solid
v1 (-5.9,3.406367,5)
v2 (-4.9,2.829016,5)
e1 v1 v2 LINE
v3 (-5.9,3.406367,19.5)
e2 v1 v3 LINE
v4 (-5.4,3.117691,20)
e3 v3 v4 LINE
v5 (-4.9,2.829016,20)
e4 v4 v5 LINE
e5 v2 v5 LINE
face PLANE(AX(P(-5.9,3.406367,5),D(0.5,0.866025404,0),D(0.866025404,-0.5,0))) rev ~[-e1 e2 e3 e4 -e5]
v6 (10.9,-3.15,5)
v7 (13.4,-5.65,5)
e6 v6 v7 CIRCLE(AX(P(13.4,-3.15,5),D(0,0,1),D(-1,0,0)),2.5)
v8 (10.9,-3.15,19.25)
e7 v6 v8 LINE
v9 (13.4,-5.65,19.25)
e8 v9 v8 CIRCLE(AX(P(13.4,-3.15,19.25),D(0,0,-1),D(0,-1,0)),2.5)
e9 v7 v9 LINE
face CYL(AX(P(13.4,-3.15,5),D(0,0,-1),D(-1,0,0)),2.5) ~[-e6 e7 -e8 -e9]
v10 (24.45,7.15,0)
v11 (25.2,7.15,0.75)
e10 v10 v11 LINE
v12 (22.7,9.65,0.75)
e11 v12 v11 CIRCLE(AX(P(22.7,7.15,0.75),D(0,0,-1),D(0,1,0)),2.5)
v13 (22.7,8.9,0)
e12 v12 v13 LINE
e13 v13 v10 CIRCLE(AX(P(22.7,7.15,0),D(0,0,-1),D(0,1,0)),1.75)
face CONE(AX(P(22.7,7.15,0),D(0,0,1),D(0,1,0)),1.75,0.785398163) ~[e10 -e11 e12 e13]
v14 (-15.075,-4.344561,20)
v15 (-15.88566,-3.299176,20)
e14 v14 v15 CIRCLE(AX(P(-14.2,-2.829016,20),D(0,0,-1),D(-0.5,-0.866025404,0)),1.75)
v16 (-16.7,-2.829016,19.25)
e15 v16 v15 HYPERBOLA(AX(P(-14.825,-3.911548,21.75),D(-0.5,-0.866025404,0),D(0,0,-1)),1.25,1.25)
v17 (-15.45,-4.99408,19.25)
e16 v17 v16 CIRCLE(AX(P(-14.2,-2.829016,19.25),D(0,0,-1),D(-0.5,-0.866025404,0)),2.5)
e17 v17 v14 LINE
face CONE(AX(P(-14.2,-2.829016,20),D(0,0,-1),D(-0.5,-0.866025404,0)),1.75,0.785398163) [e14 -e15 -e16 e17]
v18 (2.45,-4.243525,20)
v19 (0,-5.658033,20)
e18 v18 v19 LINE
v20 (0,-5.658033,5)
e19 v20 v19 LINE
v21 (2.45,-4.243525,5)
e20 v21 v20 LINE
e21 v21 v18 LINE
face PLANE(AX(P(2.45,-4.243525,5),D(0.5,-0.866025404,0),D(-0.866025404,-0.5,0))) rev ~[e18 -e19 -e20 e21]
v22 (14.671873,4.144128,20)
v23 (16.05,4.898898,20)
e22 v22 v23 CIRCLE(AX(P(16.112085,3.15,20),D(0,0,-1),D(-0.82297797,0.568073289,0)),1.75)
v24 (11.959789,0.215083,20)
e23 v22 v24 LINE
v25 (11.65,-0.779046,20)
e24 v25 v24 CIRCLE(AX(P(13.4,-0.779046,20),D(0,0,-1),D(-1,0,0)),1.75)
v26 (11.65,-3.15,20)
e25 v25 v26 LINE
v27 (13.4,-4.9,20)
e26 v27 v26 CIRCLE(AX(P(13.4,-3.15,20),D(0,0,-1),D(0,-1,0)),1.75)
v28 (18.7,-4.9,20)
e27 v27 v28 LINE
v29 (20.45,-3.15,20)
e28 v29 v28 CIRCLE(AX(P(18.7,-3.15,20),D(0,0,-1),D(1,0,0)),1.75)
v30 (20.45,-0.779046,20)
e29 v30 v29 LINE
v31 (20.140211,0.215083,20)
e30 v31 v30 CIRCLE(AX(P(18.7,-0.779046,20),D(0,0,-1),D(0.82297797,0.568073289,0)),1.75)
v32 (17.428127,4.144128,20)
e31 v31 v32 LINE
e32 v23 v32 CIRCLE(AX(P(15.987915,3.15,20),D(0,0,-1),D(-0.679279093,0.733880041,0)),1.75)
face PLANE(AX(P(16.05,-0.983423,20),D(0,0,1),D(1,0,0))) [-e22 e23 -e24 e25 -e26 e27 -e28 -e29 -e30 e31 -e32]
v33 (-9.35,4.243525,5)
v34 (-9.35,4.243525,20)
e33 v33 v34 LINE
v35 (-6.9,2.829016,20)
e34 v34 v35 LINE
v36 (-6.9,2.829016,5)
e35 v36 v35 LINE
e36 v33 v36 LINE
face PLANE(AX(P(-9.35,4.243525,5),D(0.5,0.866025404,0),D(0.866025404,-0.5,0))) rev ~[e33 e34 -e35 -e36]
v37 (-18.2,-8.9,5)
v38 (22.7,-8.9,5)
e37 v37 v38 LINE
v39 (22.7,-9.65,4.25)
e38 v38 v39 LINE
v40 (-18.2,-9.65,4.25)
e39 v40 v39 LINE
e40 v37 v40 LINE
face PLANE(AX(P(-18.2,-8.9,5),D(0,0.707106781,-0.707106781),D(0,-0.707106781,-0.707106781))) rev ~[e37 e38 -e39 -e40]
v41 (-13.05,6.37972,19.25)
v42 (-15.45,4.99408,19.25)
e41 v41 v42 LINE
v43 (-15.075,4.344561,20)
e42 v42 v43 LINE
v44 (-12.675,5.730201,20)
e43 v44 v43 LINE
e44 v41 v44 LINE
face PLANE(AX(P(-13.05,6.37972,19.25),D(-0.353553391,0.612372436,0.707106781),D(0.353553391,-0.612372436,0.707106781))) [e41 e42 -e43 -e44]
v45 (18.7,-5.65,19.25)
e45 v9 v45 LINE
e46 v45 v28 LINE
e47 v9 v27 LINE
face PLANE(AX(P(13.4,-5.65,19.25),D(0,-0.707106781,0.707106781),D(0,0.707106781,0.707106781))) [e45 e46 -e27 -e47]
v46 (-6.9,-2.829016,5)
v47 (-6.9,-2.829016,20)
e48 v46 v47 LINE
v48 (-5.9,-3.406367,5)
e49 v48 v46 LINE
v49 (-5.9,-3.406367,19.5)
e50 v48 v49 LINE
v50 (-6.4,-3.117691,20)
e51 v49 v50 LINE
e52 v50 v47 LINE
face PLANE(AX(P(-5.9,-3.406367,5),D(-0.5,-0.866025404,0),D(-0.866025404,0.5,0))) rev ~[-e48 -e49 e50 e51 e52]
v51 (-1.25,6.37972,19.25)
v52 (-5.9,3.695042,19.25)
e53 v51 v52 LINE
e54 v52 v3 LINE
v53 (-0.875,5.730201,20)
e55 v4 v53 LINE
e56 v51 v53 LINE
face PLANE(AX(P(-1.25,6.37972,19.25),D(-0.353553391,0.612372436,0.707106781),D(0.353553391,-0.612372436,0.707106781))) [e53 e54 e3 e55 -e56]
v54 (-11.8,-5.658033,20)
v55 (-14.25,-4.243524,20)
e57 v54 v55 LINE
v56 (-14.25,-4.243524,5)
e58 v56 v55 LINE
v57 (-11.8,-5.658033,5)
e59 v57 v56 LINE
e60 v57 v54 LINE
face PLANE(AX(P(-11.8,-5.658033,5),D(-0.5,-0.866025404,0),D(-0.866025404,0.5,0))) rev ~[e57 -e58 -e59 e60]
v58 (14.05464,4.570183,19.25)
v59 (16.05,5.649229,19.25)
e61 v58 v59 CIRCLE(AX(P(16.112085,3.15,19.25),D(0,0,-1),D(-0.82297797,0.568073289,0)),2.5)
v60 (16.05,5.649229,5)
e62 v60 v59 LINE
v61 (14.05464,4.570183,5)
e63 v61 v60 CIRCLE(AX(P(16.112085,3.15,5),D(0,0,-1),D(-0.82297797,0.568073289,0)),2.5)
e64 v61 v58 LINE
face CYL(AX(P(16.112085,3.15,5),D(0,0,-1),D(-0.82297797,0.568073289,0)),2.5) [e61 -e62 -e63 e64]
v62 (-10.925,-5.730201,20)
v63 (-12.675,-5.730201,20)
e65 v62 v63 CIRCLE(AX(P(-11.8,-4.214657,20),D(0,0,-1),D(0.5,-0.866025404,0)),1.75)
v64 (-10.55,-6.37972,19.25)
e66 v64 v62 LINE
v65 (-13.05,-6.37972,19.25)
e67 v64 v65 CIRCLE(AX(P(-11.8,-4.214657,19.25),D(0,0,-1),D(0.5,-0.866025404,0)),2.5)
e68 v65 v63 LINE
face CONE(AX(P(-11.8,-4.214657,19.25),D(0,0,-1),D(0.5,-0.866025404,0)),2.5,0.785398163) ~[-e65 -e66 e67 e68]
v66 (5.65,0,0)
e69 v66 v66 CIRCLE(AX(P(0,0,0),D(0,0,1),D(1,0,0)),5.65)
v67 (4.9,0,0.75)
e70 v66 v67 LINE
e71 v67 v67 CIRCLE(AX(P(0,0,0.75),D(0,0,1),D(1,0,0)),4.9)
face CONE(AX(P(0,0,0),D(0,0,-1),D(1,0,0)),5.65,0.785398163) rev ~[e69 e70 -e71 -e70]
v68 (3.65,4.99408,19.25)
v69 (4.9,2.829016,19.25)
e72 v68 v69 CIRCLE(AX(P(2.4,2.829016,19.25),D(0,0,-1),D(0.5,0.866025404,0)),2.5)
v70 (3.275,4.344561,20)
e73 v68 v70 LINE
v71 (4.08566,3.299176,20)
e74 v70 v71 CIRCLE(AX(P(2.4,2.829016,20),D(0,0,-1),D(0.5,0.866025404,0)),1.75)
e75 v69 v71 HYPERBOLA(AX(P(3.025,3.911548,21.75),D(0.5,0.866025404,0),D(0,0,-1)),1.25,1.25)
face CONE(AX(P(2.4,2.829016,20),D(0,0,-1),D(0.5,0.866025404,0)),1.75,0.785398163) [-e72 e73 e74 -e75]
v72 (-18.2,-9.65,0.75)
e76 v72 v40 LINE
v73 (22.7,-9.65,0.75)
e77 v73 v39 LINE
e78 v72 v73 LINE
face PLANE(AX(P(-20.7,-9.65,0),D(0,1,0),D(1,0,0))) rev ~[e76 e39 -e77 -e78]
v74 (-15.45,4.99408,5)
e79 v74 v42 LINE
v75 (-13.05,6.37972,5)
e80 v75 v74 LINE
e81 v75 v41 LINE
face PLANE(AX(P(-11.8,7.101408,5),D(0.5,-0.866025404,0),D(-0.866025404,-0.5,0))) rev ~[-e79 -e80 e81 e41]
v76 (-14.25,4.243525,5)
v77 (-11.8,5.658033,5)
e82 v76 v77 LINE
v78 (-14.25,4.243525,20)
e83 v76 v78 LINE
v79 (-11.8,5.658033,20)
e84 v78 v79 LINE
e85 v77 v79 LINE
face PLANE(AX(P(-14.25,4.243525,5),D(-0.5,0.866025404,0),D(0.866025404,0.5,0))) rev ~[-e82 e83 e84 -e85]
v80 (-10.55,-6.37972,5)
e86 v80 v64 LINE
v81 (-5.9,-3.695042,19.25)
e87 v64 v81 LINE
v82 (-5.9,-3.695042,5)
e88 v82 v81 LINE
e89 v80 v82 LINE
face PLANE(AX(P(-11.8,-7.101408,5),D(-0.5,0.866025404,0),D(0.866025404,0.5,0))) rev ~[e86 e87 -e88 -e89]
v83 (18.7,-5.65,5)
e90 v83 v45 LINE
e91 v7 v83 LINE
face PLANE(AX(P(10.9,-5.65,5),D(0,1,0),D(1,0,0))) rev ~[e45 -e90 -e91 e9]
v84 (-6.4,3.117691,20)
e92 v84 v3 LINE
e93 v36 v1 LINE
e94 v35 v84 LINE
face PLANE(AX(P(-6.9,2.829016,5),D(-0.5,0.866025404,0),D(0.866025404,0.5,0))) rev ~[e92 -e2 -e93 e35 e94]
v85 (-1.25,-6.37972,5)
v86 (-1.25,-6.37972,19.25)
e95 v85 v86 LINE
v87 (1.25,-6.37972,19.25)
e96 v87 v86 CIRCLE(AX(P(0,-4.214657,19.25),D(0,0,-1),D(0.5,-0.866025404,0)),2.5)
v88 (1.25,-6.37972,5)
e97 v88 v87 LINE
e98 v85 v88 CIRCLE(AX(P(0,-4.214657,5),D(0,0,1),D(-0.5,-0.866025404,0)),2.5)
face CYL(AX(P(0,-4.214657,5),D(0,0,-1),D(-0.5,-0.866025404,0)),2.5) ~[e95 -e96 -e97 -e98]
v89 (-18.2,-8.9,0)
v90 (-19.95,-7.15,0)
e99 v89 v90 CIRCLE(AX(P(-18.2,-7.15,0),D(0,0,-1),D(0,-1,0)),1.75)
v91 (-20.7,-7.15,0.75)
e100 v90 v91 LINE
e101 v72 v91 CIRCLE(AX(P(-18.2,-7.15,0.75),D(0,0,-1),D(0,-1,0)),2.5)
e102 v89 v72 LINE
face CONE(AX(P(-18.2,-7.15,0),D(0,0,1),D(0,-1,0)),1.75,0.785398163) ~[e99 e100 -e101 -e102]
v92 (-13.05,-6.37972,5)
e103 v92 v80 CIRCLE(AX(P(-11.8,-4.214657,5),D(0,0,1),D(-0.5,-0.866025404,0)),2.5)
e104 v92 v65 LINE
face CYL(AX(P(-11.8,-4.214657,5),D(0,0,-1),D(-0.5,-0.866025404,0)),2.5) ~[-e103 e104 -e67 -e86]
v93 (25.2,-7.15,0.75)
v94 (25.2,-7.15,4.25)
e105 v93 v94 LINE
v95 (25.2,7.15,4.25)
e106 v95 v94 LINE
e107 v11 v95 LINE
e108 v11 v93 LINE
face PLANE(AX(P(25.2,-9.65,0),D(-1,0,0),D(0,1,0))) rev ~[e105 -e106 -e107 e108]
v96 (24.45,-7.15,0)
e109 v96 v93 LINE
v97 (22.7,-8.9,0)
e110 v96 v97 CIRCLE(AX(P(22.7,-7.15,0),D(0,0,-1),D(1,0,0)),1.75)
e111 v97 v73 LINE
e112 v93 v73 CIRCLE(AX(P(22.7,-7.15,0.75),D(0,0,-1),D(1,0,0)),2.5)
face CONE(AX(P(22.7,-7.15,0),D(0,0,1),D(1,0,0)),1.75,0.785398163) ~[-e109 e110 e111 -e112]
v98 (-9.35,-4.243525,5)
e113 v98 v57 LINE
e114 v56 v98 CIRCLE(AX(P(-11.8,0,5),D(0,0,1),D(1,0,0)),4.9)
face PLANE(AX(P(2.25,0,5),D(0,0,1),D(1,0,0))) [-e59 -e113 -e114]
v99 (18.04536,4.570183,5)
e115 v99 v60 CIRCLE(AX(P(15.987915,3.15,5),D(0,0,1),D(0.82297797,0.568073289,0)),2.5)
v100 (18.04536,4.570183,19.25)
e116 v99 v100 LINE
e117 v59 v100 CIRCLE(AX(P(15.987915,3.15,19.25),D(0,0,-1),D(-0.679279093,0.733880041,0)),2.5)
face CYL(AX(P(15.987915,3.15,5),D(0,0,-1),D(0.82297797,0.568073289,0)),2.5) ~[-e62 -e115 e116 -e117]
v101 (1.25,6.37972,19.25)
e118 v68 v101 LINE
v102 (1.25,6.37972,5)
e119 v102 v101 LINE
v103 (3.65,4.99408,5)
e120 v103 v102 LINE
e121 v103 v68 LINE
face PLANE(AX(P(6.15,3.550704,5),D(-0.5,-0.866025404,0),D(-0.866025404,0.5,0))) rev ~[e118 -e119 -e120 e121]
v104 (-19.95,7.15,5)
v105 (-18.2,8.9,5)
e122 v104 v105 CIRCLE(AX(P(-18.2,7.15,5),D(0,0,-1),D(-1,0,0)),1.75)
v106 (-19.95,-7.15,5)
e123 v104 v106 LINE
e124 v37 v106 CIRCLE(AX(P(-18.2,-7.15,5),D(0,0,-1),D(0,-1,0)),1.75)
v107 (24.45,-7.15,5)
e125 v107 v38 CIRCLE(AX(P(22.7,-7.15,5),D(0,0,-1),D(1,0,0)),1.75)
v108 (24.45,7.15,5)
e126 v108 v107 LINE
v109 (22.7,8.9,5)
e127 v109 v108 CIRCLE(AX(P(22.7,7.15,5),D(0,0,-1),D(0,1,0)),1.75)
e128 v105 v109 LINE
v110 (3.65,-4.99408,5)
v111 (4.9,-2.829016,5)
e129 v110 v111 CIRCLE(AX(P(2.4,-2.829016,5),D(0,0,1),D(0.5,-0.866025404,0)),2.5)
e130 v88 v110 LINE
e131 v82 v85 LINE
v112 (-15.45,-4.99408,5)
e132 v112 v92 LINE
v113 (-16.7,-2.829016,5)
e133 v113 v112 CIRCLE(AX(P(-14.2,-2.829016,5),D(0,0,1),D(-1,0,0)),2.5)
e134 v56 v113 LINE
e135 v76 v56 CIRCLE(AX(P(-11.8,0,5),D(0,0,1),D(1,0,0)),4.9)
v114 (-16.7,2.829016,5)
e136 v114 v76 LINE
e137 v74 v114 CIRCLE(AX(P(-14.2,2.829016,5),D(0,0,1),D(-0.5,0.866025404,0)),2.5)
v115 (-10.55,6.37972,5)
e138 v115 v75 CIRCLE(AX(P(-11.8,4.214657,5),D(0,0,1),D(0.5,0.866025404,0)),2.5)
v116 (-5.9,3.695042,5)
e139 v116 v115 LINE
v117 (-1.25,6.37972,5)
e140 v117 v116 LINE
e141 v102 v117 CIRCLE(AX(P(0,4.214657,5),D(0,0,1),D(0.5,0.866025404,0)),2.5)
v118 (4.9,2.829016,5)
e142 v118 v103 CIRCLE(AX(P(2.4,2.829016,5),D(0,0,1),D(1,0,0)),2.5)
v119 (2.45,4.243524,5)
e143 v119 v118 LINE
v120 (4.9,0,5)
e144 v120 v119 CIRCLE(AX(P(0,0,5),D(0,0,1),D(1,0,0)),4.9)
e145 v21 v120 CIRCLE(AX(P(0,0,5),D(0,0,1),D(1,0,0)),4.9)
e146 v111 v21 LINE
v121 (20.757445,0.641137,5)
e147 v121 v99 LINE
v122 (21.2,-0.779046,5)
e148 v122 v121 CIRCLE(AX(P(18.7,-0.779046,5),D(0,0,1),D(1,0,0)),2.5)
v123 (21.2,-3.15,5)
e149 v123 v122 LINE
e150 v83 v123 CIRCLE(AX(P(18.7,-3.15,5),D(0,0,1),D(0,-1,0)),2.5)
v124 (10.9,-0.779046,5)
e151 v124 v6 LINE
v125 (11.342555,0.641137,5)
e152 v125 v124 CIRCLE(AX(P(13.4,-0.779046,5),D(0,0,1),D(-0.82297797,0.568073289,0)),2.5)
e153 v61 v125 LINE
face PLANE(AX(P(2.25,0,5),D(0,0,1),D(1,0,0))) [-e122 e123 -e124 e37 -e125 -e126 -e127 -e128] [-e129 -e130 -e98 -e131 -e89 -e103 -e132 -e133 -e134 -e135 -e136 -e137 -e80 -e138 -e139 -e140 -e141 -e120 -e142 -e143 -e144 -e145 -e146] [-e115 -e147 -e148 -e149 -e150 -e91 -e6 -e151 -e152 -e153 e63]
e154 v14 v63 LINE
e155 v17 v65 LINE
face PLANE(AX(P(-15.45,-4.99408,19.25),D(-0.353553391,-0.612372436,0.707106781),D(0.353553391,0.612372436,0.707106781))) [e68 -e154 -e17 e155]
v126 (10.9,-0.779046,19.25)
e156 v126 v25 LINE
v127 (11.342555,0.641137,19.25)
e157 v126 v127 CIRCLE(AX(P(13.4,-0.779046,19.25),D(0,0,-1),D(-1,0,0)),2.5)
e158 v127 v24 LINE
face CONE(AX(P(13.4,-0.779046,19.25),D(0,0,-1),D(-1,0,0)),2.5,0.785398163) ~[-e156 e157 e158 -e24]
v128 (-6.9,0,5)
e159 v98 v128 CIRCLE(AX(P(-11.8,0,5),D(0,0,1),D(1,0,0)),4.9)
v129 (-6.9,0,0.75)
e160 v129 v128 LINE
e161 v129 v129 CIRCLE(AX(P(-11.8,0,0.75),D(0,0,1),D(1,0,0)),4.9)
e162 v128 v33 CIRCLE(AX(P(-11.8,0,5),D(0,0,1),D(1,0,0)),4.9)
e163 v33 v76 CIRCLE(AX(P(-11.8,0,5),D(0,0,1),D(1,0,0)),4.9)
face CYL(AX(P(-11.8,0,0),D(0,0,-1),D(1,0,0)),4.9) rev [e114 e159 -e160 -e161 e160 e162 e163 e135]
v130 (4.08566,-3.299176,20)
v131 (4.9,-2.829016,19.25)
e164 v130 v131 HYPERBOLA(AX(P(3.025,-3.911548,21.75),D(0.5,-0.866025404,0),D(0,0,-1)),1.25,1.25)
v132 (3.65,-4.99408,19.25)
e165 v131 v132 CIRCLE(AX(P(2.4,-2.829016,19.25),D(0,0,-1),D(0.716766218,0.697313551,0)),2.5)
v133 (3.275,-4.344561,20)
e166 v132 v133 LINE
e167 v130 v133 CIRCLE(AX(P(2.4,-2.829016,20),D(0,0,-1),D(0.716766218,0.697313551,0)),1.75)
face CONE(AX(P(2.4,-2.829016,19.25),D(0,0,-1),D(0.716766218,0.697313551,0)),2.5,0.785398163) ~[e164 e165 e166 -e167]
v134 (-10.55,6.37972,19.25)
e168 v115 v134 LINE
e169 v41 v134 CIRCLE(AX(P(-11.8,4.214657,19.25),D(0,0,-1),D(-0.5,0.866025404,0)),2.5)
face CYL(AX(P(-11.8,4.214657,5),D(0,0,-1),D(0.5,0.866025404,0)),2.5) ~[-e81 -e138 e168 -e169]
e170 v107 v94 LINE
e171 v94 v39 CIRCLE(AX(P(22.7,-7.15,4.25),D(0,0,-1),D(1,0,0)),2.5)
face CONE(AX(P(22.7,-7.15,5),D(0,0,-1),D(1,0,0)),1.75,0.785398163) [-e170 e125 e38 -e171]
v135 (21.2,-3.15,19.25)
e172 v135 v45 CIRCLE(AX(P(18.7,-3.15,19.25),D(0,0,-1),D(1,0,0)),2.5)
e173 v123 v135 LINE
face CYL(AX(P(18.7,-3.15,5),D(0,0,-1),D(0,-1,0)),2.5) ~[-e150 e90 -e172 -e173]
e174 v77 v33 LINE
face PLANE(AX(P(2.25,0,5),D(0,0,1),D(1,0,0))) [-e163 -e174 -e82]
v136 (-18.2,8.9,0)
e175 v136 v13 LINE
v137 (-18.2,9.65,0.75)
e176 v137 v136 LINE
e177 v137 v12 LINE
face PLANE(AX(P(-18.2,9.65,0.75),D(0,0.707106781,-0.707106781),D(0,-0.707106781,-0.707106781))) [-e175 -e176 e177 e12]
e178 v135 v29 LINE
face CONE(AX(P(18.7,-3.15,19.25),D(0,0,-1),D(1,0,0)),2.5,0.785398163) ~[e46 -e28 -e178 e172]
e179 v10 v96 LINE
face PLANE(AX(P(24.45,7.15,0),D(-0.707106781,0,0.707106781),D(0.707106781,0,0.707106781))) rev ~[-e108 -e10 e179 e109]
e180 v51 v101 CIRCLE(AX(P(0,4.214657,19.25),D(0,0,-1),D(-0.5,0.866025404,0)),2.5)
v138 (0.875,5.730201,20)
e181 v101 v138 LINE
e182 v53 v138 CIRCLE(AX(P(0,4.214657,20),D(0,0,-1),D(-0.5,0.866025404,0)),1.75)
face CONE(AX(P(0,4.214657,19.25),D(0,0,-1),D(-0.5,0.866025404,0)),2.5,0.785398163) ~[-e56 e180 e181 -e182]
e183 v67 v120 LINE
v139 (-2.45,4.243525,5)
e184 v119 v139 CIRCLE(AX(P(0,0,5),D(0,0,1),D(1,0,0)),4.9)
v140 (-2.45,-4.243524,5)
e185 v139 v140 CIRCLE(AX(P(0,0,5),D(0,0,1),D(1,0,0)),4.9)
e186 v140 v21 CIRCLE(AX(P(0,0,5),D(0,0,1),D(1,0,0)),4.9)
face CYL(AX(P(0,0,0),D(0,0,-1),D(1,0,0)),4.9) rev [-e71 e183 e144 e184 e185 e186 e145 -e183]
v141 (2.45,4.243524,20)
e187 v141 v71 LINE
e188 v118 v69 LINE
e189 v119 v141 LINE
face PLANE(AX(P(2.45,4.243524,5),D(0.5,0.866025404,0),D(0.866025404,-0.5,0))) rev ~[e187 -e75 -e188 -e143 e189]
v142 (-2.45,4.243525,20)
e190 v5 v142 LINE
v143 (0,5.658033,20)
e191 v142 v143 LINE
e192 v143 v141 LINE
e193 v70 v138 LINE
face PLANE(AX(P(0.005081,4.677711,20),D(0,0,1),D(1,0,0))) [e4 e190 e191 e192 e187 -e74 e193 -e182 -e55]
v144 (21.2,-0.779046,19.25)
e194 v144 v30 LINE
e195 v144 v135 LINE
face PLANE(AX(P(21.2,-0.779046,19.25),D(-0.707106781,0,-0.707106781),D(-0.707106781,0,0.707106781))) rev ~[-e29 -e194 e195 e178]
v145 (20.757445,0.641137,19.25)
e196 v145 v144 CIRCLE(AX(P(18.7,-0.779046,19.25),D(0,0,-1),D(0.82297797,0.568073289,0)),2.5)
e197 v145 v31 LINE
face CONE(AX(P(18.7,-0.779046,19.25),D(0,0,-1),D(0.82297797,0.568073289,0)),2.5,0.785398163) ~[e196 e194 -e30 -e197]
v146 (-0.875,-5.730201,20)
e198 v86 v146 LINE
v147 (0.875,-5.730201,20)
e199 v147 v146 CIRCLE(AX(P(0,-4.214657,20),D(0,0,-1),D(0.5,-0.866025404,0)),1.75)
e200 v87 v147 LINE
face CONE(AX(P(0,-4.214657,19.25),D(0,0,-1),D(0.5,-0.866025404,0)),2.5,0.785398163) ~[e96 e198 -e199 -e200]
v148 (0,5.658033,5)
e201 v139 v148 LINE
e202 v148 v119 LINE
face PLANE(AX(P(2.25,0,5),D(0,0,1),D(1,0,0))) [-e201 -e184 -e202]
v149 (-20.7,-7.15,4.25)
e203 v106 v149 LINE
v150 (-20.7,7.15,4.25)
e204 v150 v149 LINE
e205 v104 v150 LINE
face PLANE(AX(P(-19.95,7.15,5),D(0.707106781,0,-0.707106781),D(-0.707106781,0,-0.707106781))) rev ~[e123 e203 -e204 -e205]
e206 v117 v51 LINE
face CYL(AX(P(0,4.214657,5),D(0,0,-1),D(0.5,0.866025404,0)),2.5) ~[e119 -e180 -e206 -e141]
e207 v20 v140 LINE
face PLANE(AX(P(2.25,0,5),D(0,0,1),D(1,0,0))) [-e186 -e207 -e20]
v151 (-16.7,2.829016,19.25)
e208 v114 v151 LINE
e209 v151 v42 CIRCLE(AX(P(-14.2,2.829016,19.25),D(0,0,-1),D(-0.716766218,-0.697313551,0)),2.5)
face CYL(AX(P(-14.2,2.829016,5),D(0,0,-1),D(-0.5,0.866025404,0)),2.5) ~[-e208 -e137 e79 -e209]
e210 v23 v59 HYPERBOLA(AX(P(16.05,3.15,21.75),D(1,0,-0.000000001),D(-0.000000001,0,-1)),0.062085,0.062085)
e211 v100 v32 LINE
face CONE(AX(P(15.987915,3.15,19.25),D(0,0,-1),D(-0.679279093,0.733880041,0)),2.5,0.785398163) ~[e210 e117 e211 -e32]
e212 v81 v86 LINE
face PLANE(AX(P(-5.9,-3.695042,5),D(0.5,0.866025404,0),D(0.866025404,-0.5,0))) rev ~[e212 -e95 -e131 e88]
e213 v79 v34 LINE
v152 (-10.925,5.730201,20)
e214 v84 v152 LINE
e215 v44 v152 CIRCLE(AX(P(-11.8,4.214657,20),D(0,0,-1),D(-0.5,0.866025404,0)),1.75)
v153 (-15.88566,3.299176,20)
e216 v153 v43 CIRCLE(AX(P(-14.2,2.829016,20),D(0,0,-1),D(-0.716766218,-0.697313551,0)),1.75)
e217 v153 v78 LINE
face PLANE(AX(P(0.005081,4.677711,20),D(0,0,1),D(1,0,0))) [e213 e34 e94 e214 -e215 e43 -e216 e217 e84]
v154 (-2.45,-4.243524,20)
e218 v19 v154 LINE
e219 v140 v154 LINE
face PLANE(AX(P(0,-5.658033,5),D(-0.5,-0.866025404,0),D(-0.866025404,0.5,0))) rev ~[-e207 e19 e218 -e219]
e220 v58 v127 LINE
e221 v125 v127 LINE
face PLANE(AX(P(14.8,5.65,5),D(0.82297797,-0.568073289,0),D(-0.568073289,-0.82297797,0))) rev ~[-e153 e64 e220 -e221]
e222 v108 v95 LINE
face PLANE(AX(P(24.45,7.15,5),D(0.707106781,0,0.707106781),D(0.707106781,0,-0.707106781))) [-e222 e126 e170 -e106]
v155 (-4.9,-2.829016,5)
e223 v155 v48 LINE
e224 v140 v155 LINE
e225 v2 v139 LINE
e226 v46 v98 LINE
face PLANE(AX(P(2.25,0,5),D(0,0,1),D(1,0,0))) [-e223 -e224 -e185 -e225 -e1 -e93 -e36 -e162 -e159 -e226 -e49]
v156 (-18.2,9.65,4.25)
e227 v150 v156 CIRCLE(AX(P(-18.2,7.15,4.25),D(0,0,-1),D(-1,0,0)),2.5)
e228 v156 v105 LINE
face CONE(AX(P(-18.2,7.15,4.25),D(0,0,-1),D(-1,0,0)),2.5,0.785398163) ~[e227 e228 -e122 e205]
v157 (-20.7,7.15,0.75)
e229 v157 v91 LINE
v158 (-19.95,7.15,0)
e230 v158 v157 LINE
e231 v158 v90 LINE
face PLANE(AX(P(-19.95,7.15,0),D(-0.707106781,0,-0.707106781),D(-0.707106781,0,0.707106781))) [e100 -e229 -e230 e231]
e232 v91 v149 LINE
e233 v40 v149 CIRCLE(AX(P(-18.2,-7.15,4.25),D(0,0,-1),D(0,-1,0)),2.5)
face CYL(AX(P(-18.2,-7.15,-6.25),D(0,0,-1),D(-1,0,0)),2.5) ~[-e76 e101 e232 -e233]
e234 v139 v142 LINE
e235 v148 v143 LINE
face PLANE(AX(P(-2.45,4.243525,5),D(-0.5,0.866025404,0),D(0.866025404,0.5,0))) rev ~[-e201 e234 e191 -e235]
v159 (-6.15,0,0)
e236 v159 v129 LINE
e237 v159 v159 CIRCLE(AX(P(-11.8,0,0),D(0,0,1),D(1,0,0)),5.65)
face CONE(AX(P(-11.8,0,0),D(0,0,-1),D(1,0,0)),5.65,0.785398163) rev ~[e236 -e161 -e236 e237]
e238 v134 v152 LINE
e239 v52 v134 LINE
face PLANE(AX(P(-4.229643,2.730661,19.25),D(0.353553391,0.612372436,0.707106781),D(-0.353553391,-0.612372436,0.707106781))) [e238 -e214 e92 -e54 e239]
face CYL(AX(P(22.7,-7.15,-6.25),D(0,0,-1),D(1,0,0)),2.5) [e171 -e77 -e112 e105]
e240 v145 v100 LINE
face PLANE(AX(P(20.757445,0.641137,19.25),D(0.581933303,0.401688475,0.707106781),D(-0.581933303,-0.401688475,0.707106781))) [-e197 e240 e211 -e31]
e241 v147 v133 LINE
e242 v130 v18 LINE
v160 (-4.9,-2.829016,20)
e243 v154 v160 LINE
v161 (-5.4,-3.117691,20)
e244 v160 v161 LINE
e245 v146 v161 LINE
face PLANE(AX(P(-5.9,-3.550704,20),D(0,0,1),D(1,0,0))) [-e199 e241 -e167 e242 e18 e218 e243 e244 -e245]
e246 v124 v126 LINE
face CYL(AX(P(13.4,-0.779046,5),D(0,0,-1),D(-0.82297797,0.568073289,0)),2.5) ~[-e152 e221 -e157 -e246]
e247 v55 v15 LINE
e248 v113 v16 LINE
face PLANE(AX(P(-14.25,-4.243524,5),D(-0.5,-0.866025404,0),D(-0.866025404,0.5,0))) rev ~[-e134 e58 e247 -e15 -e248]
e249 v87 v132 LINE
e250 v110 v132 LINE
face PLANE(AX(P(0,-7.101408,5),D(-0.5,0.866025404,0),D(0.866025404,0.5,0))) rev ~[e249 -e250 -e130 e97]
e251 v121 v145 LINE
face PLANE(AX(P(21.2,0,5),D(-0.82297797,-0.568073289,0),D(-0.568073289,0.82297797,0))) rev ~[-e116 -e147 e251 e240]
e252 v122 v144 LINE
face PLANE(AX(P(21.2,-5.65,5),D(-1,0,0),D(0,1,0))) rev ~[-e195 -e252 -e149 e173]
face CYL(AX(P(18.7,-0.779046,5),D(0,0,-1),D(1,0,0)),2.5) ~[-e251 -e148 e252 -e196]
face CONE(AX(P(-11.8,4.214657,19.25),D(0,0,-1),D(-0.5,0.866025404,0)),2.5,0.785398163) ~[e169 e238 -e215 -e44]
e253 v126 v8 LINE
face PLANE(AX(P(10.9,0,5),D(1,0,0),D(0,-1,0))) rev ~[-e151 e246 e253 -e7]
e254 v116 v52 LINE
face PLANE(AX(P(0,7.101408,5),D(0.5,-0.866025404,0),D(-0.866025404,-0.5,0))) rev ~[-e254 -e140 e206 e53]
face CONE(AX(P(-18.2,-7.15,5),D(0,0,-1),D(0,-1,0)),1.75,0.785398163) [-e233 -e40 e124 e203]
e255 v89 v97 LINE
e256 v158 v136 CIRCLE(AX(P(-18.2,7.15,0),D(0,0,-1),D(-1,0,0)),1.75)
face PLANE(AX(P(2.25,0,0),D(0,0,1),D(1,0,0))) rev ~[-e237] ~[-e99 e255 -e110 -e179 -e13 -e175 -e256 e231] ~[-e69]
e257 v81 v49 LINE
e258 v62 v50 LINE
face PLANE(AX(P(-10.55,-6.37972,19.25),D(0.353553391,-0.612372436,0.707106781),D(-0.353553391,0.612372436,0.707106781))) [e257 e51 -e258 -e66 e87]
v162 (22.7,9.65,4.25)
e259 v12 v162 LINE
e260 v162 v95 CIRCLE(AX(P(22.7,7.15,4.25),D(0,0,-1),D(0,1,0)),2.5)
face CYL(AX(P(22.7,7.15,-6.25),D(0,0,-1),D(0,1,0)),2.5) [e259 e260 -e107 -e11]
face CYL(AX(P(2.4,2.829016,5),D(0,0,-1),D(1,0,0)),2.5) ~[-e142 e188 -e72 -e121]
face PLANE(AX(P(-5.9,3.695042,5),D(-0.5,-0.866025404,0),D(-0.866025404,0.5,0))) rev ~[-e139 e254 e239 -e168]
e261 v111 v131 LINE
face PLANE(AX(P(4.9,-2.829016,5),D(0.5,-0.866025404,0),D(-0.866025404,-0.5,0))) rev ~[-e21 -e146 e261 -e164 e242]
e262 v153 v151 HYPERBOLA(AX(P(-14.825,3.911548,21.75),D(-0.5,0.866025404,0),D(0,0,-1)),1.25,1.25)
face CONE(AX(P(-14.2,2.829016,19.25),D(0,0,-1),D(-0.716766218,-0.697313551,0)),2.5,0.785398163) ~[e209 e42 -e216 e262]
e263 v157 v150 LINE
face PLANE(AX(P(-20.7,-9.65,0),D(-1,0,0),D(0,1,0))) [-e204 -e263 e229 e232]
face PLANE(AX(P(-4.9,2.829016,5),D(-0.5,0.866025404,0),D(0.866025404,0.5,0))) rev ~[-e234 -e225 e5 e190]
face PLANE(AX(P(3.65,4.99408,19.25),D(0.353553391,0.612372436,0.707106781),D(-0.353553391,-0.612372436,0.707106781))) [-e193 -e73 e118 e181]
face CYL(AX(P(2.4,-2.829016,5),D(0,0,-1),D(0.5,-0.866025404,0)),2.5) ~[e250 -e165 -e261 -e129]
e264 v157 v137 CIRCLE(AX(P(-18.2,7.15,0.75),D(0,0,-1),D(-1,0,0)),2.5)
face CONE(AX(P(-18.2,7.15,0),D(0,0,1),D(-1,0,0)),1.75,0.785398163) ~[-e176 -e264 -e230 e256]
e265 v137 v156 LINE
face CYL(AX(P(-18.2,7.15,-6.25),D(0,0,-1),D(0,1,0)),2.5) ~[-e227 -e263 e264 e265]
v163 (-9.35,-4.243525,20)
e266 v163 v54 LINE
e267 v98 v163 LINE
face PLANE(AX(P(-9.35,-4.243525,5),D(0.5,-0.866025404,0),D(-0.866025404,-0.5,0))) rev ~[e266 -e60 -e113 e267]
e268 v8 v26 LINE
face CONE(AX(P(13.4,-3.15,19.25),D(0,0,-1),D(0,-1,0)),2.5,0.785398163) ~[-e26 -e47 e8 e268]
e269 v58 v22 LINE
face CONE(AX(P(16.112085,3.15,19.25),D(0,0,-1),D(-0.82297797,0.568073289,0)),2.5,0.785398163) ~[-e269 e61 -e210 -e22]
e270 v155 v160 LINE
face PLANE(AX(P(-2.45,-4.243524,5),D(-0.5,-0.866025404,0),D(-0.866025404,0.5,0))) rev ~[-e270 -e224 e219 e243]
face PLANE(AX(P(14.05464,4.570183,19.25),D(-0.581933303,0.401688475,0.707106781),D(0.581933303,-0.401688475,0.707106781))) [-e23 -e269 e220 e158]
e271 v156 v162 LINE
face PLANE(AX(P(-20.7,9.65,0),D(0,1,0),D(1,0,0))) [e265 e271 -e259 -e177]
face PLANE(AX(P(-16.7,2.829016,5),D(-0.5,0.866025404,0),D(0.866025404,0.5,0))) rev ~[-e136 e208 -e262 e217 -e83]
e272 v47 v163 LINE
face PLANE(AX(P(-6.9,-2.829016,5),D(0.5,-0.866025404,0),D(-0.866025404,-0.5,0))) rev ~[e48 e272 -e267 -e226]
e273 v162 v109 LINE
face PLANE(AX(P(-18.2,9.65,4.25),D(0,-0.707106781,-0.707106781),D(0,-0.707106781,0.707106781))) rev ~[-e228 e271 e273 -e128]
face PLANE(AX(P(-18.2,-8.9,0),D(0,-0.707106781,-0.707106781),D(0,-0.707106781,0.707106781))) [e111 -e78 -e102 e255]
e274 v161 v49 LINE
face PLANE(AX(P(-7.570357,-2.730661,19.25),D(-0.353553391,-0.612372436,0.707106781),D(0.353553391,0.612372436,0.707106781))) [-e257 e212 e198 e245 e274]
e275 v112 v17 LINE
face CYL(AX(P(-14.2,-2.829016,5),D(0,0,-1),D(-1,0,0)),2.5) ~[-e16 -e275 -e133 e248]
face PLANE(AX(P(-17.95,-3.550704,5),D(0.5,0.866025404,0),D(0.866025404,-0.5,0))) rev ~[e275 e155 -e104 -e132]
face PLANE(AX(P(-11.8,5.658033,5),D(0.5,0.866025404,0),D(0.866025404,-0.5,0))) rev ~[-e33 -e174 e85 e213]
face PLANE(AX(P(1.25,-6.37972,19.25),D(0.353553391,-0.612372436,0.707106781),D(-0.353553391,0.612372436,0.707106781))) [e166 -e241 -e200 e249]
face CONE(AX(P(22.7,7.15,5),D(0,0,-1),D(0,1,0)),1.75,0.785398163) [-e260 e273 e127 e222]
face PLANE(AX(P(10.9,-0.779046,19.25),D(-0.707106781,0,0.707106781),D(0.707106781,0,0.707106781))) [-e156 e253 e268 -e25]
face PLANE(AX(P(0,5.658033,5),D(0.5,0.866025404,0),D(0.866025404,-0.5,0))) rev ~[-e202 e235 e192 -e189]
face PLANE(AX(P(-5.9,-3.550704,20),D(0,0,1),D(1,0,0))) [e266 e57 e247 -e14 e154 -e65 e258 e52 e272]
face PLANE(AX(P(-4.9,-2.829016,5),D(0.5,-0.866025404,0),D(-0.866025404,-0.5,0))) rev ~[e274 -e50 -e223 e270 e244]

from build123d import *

# Parameters (mm, degrees)
F0_W          = 45.9
F0_H          = 19.3
F0_R          = 4.9
F1_DEPTH      = 5
F3_DEPTH      = 15
F4_T1_DEPTH   = 17.5
F4_T3_DEPTH   = 18.2802116758
F4_T5_DEPTH   = 21.25
F4_T7_DEPTH   = 16.9476143508
F4_T9_DEPTH   = 18.6084391824
F4_T11_DEPTH  = 22.2168783649
F5_T1_DEPTH   = 4.7741809443
F5_T3_DEPTH   = 2.3709542597
F5_T5_DEPTH   = 5.3
F5_T7_DEPTH   = 4.7741809443
F5_T9_DEPTH   = 40.9
F5_T11_DEPTH  = 14.3
F5_T13_DEPTH  = 2.7712812921
F5_T15_DEPTH  = 2.7712812921
F5_T17_DEPTH  = 2.7712812921
F5_T19_DEPTH  = 2.7712812921
F5_T22_ANGLE  = 98.1713551602
F5_T24_ANGLE  = 98.1713551602
F5_T26_ANGLE  = 34.6159793172
F5_T28_ANGLE  = 90.0000000053
F5_T30_ANGLE  = 90.0000000053
F5_T32_ANGLE  = 34.6159793172
F5_T34_ANGLE  = 90.0000000053
F5_T36_ANGLE  = 90.0000000053
F5_T38_ANGLE  = 90.0000000053
F5_T40_ANGLE  = 90.0000000053
F5_T48_DEPTH  = 7.2981197444
F5_T51_ANGLE  = 60.0000000105
F5_T53_ANGLE  = 90.0000000053
F5_T55_ANGLE  = 90.0000000053
F5_T57_ANGLE  = 90.0000000053
F5_T59_ANGLE  = 90.0000000053
F5_T63_DEPTH  = 7.2981197444
F5_T68_DEPTH  = 7.2981197444
F5_T71_ANGLE  = 60.0000000105
F5_T73_ANGLE  = 60.0000000105
F5_T77_DEPTH  = 7.2981197444
F5_T80_ANGLE  = 60.0000000105
F5_T82_ANGLE  = 104.2118652522
F5_T84_ANGLE  = 104.2118652522
F5_T86_ANGLE  = 104.2118652522
F5_T88_ANGLE  = 104.2118652522
F5_T93_DEPTH  = 7.2981197444
F5_T97_DEPTH  = 7.2981197444
F5_T104_DEPTH = 7.2981197444
F5_T108_DEPTH = 7.2981197444


# Not quite as in the source:
# - a fillet or chamfer that OpenCascade refuses, or shapes differently, is made with other operations: its cross-section is extruded or revolved along the edge and cut away or added
# - a feature names something its author has since deleted; it is built from what else it names


with BuildPart() as f1:
    # F0 (on Top) → F1 (new body)
    with BuildSketch(Plane.XY):
        with Locations((2.25, 0)):
            Rectangle(F0_W, F0_H)
        with Locations((-11.8, 0)):
            Circle(F0_R, mode=Mode.SUBTRACT)
        Circle(F0_R, mode=Mode.SUBTRACT)
        Polygon((10.9, 0), (14.8, 5.65), (17.3, 5.65), (21.2, 0), (21.2, -5.65), (10.9, -5.65), align=None, mode=Mode.SUBTRACT)
        Polygon((17.3, 5.65), (14.8, 5.65), (10.9, 0), (10.9, -5.65), (21.2, -5.65), (21.2, 0), align=None)
    extrude(amount=F1_DEPTH)

    # F2 (on face) → F3 (join)
    with BuildSketch(Plane.XY.offset(5)):
        Polygon((14.8, 5.65), (10.9, 0), (10.9, -5.65), (21.2, -5.65), (21.2, 0), (17.3, 5.65), align=None)
        Polygon((-5.65, -3.5507041555), (-5.9, -3.4063665882), (-6.15, -3.5507041555), (-5.9, -3.6950417228), align=None)
        Polygon((-5.9, -3.4063665882), (-6.9, -2.829016319), (-9.3500000593, -4.2435245128), (-11.8, -5.6580326381), (-14.2500001426, -4.2435243962), (-16.7, -2.829016319), (-17.95, -3.5507041555), (-11.8, -7.101408311), (-5.9, -3.6950417228), (-6.15, -3.5507041555), align=None)
        Polygon((-4.9, -2.829016319), (-5.9, -3.4063665882), (-5.65, -3.5507041555), (-5.9, -3.6950417228), (0, -7.101408311), (6.15, -3.5507041555), (4.9, -2.829016319), (2.4499999307, -4.2435245185), (0, -5.6580326381), (-2.4500000255, -4.2435244638), align=None)
        Polygon((-4.9, 2.829016319), (-2.4499999531, 4.2435245056), (0, 5.6580326381), (2.4500000055, 4.2435244754), (4.9, 2.829016319), (6.15, 3.5507041555), (0, 7.101408311), (-5.9, 3.6950417228), (-5.65, 3.5507041555), (-5.9, 3.4063665882), align=None)
        Polygon((-16.7, 2.829016319), (-14.2499999083, 4.2435245315), (-11.8, 5.6580326381), (-9.3500001117, 4.243524543), (-6.9, 2.829016319), (-5.9, 3.4063665882), (-6.15, 3.5507041555), (-5.9, 3.6950417228), (-11.8, 7.101408311), (-17.95, 3.5507041555), align=None)
        Polygon((-6.15, 3.5507041555), (-5.9, 3.4063665882), (-5.65, 3.5507041555), (-5.9, 3.6950417228), align=None)
    extrude(amount=F3_DEPTH)

    # F4: fillet of radius 2.5 on 18 edges, made by hand

    # F4_s2 → F4_t1 (cut)
    with BuildSketch(Plane.XY.offset(-6.25)):
        with BuildLine():
            ThreePointArc((25.2, -7.15), (24.467766953, -8.917766953), (22.7, -9.65))
            Line((22.7, -9.65), (25.2, -9.65))
            Line((25.2, -9.65), (25.2, -7.15))
        make_face()
        with BuildLine():
            ThreePointArc((22.7, 9.65), (24.467766953, 8.917766953), (25.2, 7.15))
            Line((25.2, 7.15), (25.2, 9.65))
            Line((25.2, 9.65), (22.7, 9.65))
        make_face()
        with BuildLine():
            ThreePointArc((-18.2, 9.65), (-19.967766953, 8.917766953), (-20.7, 7.15))
            Line((-20.7, 7.15), (-20.7, 9.65))
            Line((-20.7, 9.65), (-18.2, 9.65))
        make_face()
        with BuildLine():
            ThreePointArc((-20.7, -7.15), (-19.967766953, -8.917766953), (-18.2, -9.65))
            Line((-18.2, -9.65), (-20.7, -9.65))
            Line((-20.7, -9.65), (-20.7, -7.15))
        make_face()
    extrude(amount=F4_T1_DEPTH, mode=Mode.SUBTRACT)

    # F4_s4 → F4_t3 (cut)
    with BuildSketch(Plane.XY.offset(5)):
        with BuildLine():
            ThreePointArc((14.0546397462, 4.570183222), (14.9502882284, 5.3636460935), (16.1120846703, 5.65))
            Line((16.1120846703, 5.65), (14.8, 5.65))
            Line((14.8, 5.65), (14.0546397462, 4.570183222))
        make_face()
        with BuildLine():
            ThreePointArc((18.0453602538, 4.570183222), (17.1497117716, 5.3636460935), (15.9879153297, 5.65))
            Line((15.9879153297, 5.65), (17.3, 5.65))
            Line((17.3, 5.65), (18.0453602538, 4.570183222))
        make_face()
    extrude(amount=F4_T3_DEPTH, mode=Mode.SUBTRACT)

    # F4_s6 → F4_t5 (cut)
    with BuildSketch(Plane.XY.offset(5)):
        with BuildLine():
            ThreePointArc((18.7, -5.65), (20.467766953, -4.917766953), (21.2, -3.15))
            Line((21.2, -3.15), (21.2, -5.65))
            Line((21.2, -5.65), (18.7, -5.65))
        make_face()
        with BuildLine():
            ThreePointArc((10.9, -3.15), (11.632233047, -4.917766953), (13.4, -5.65))
            Line((13.4, -5.65), (10.9, -5.65))
            Line((10.9, -5.65), (10.9, -3.15))
        make_face()
    extrude(amount=F4_T5_DEPTH, mode=Mode.SUBTRACT)

    # F4_s8 → F4_t7 (cut)
    with BuildSketch(Plane.XY.offset(5)):
        with BuildLine():
            ThreePointArc((21.2, -0.7790457403), (21.0867983064, -0.0352757189), (20.7574449242, 0.6411374817))
            Line((20.7574449242, 0.6411374817), (21.2, 0))
            Line((21.2, 0), (21.2, -0.7790457403))
        make_face()
        with BuildLine():
            ThreePointArc((11.3425550758, 0.6411374817), (11.0132016936, -0.0352757189), (10.9, -0.7790457403))
            Line((10.9, -0.7790457403), (10.9, 0))
            Line((10.9, 0), (11.3425550758, 0.6411374817))
        make_face()
    extrude(amount=F4_T7_DEPTH, mode=Mode.SUBTRACT)

    # F4_s10 → F4_t9 (cut)
    with BuildSketch(Plane.XY.offset(5)):
        with BuildLine():
            ThreePointArc((-1.25, -6.3797204745), (0, -6.7146569651), (1.25, -6.3797204745))
            Line((1.25, -6.3797204745), (0, -7.101408311))
            Line((0, -7.101408311), (-1.25, -6.3797204745))
        make_face()
        with BuildLine():
            ThreePointArc((-13.05, -6.3797204745), (-11.8, -6.7146569651), (-10.55, -6.3797204745))
            Line((-10.55, -6.3797204745), (-11.8, -7.101408311))
            Line((-11.8, -7.101408311), (-13.05, -6.3797204745))
        make_face()
        with BuildLine():
            ThreePointArc((1.25, 6.3797204745), (0, 6.7146569651), (-1.25, 6.3797204745))
            Line((-1.25, 6.3797204745), (0, 7.101408311))
            Line((0, 7.101408311), (1.25, 6.3797204745))
        make_face()
        with BuildLine():
            ThreePointArc((-10.55, 6.3797204745), (-11.8, 6.7146569651), (-13.05, 6.3797204745))
            Line((-13.05, 6.3797204745), (-11.8, 7.101408311))
            Line((-11.8, 7.101408311), (-10.55, 6.3797204745))
        make_face()
    extrude(amount=F4_T9_DEPTH, mode=Mode.SUBTRACT)

    # F4_s12 → F4_t11 (cut)
    with BuildSketch(Plane.XY.offset(5)):
        with BuildLine():
            ThreePointArc((4.9, 2.829016319), (4.5650635095, 4.079016319), (3.65, 4.9940798285))
            Line((3.65, 4.9940798285), (6.15, 3.5507041555))
            Line((6.15, 3.5507041555), (4.9, 2.829016319))
        make_face()
        with BuildLine():
            ThreePointArc((3.65, -4.9940798285), (4.5650635095, -4.079016319), (4.9, -2.829016319))
            Line((4.9, -2.829016319), (6.15, -3.5507041555))
            Line((6.15, -3.5507041555), (3.65, -4.9940798285))
        make_face()
        with BuildLine():
            ThreePointArc((-16.7, -2.829016319), (-16.3650635095, -4.079016319), (-15.45, -4.9940798285))
            Line((-15.45, -4.9940798285), (-17.95, -3.5507041555))
            Line((-17.95, -3.5507041555), (-16.7, -2.829016319))
        make_face()
        with BuildLine():
            ThreePointArc((-15.45, 4.9940798285), (-16.3650635095, 4.079016319), (-16.7, 2.829016319))
            Line((-16.7, 2.829016319), (-17.95, 3.5507041555))
            Line((-17.95, 3.5507041555), (-15.45, 4.9940798285))
        make_face()
    extrude(amount=F4_T11_DEPTH, mode=Mode.SUBTRACT)

    # F5: chamfer of 0.75 on 45 edges, made by hand

    # F5_s2 → F5_t1 (cut)
    with BuildSketch(Plane(origin=(6.3988388668, -9.2701127172, 0), x_dir=(0, 0, 1), z_dir=(-0.5680732888, 0.8229779697, 0))):
        Polygon((19.25, 17.4471329569), (20, 16.6971329569), (20, 17.4471329569), align=None)
    extrude(amount=F5_T1_DEPTH, mode=Mode.SUBTRACT)

    # F5_s4 → F5_t3 (cut)
    with BuildSketch(Plane.XZ.offset(0.7790457403)):
        Polygon((21.2, 19.25), (20.45, 20), (21.2, 20), align=None)
        Polygon((10.9, 19.25), (11.65, 20), (10.9, 20), align=None)
    extrude(amount=F5_T3_DEPTH, mode=Mode.SUBTRACT)

    # F5_s6 → F5_t5 (cut)
    with BuildSketch(Plane.YZ.offset(13.4)):
        Polygon((-5.65, 19.25), (-4.9, 20), (-5.65, 20), align=None)
    extrude(amount=F5_T5_DEPTH, mode=Mode.SUBTRACT)

    # F5_s8 → F5_t7 (cut)
    with BuildSketch(Plane(origin=(6.6721488959, 9.666061862, 0), x_dir=(0, 0, 1), z_dir=(-0.5680732888, -0.8229779697, 0))):
        Polygon((19.25, -8.9704598694), (20, -9.7204598694), (20, -8.9704598694), align=None)
    extrude(amount=F5_T7_DEPTH, mode=Mode.SUBTRACT)

    # F5_s10 → F5_t9 (cut)
    with BuildSketch(Plane.YZ.offset(-18.2)):
        Polygon((-8.9, 5), (-9.65, 4.25), (-9.65, 5), align=None)
        Polygon((-8.9, 0), (-9.65, 0.75), (-9.65, 0), align=None)
        Polygon((9.65, 0.75), (8.9, 0), (9.65, 0), align=None)
        Polygon((9.65, 4.25), (8.9, 5), (9.65, 5), align=None)
    extrude(amount=F5_T9_DEPTH, mode=Mode.SUBTRACT)

    # F5_s12 → F5_t11 (cut)
    with BuildSketch(Plane.XZ.offset(-7.15)):
        Polygon((24.45, 0), (25.2, 0.75), (25.2, 0), align=None)
        Polygon((-19.95, 0), (-20.7, 0.75), (-20.7, 0), align=None)
        Polygon((-19.95, 5), (-20.7, 4.25), (-20.7, 5), align=None)
        Polygon((24.45, 5), (25.2, 4.25), (25.2, 5), align=None)
    extrude(amount=F5_T11_DEPTH, mode=Mode.SUBTRACT)

    # F5_s14 → F5_t13 (cut)
    with BuildSketch(Plane(origin=(-1.825, -1.0536642413, 0), x_dir=(0, 0, 1), z_dir=(0.8660254038, 0.5, 0))):
        Polygon((19.25, 6.15), (20, 5.4), (20, 6.15), align=None)
    extrude(amount=F5_T13_DEPTH, mode=Mode.SUBTRACT)

    # F5_s16 → F5_t15 (cut)
    with BuildSketch(Plane(origin=(0.575, -0.3319764048, 0), x_dir=(0, 0, 1), z_dir=(-0.8660254038, 0.5, 0))):
        Polygon((19.25, 6.15), (20, 5.4), (20, 6.15), align=None)
    extrude(amount=F5_T15_DEPTH, mode=Mode.SUBTRACT)

    # F5_s18 → F5_t17 (cut)
    with BuildSketch(Plane(origin=(-7.025, -4.0558856411, 0), x_dir=(0, 0, 1), z_dir=(-0.8660254038, -0.5, 0))):
        Polygon((19.25, 12.05), (20, 11.3), (20, 12.05), align=None)
    extrude(amount=F5_T17_DEPTH, mode=Mode.SUBTRACT)

    # F5_s20 → F5_t19 (cut)
    with BuildSketch(Plane(origin=(-9.425, 5.4415262871, 0), x_dir=(0, 0, 1), z_dir=(0.8660254038, -0.5, 0))):
        Polygon((19.25, 12.05), (20, 11.3), (20, 12.05), align=None)
    extrude(amount=F5_T19_DEPTH, mode=Mode.SUBTRACT)

    # F5_s21 → F5_t22 (revolve, cut)
    with BuildSketch(Plane(origin=(6.6721488969, 9.6660618621, 0), x_dir=(0, 0, 1), z_dir=(-0.5680732888, -0.8229779696, 0))):
        Polygon((19.25, -8.9704598686), (20, -9.7204598686), (20, -8.9704598686), align=None)
    revolve(axis=Axis((16.1120846705, 3.1499999997, 20), (0, 0, -1)), revolution_arc=F5_T22_ANGLE, mode=Mode.SUBTRACT)

    # F5_s23 → F5_t24 (revolve, cut)
    with BuildSketch(Plane(origin=(10.1810745714, 9.4235988418, 0), x_dir=(0, 0, 1), z_dir=(-0.7338800405, -0.6792790929, 0))):
        Polygon((19.25, -6.0485344953), (20, -6.7985344953), (20, -6.0485344953), align=None)
    revolve(axis=Axis((15.9879153295, 3.1499999997, 20), (0, 0, -1)), revolution_arc=F5_T24_ANGLE, mode=Mode.SUBTRACT)

    # F5_s25 → F5_t26 (revolve, cut)
    with BuildSketch(Plane(origin=(6.3988388671, -9.2701127174, 0), x_dir=(0, 0, 1), z_dir=(-0.5680732888, 0.8229779697, 0))):
        Polygon((19.25, 17.4471329568), (20, 16.6971329568), (20, 17.4471329568), align=None)
    revolve(axis=Axis((18.7000000003, -0.7790457401, 20), (0, 0, -1)), revolution_arc=F5_T26_ANGLE, mode=Mode.SUBTRACT)

    # F5_s27 → F5_t28 (revolve, cut)
    with BuildSketch(Plane.XZ.offset(3.1500000001)):
        Polygon((21.2, 19.25), (20.45, 20), (21.2, 20), align=None)
    revolve(axis=Axis((18.7000000001, -3.1500000001, 20), (0, 0, -1)), revolution_arc=F5_T28_ANGLE, mode=Mode.SUBTRACT)

    # F5_s29 → F5_t30 (revolve, cut)
    with BuildSketch(Plane.YZ.offset(13.3999999999)):
        Polygon((-5.65, 19.25), (-4.9, 20), (-5.65, 20), align=None)
    revolve(axis=Axis((13.3999999999, -3.1500000001, 20), (0, 0, -1)), revolution_arc=F5_T30_ANGLE, mode=Mode.SUBTRACT)

    # F5_s31 → F5_t32 (revolve, cut)
    with BuildSketch(Plane.XZ.offset(0.7790457401)):
        Polygon((10.9, 19.25), (11.65, 20), (10.9, 20), align=None)
    revolve(axis=Axis((13.3999999997, -0.7790457401, 20), (0, 0, -1)), revolution_arc=F5_T32_ANGLE, mode=Mode.SUBTRACT)

    # F5_s33 → F5_t34 (revolve, cut)
    with BuildSketch(Plane.YZ.offset(22.7000000001)):
        Polygon((8.9, 0), (9.65, 0.75), (9.65, 0), align=None)
    revolve(axis=Axis((22.7000000001, 7.1500000001, 0), (0, 0, -1)), revolution_arc=F5_T34_ANGLE, mode=Mode.SUBTRACT)

    # F5_s35 → F5_t36 (revolve, cut)
    with BuildSketch(Plane.XZ.offset(7.1500000001)):
        Polygon((24.45, 0), (25.2, 0.75), (25.2, 0), align=None)
    revolve(axis=Axis((22.7000000001, -7.1500000001, 0), (0, 0, -1)), revolution_arc=F5_T36_ANGLE, mode=Mode.SUBTRACT)

    # F5_s37 → F5_t38 (revolve, cut)
    with BuildSketch(Plane.YZ.offset(-18.2000000001)):
        Polygon((-8.9, 0), (-9.65, 0.75), (-9.65, 0), align=None)
    revolve(axis=Axis((-18.2000000001, -7.1500000001, 0), (0, 0, -1)), revolution_arc=F5_T38_ANGLE, mode=Mode.SUBTRACT)

    # F5_s39 → F5_t40 (revolve, cut)
    with BuildSketch(Plane.XZ.offset(-7.1500000001)):
        Polygon((-19.95, 0), (-20.7, 0.75), (-20.7, 0), align=None)
    revolve(axis=Axis((-18.2000000001, 7.1500000001, 0), (0, 0, -1)), revolution_arc=F5_T40_ANGLE, mode=Mode.SUBTRACT)

    # F5_s41 → F5_t42 (revolve, cut)
    with BuildSketch(Plane.XZ):
        Polygon((-6.15, 0), (-6.9, 0.75), (-6.9, 0), align=None)
    revolve(axis=Axis((-11.8, 0, 0), (0, 0, 1)), mode=Mode.SUBTRACT)

    # F5_s43 → F5_t44 (revolve, cut)
    with BuildSketch(Plane.XZ):
        Polygon((5.65, 0), (4.9, 0.75), (4.9, 0), align=None)
    revolve(axis=Axis((0, 0, 0), (0, 0, 1)), mode=Mode.SUBTRACT)


with BuildPart() as f5_tool46:
    # F5_s47 → F5_t48 (new body)
    with BuildSketch(Plane(origin=(-10.675, -6.1632141236, 0), x_dir=(0, 0, 1), z_dir=(0.8660254038, 0.5, 0))):
        Polygon((19.25, 0.25), (20, -0.5), (20, 0.25), align=None)
    extrude(amount=F5_T48_DEPTH)

    split(bisect_by=Plane(origin=(-3.075, -5.3260562333, 0), x_dir=(0, 0, 1), z_dir=(-0.5, -0.8660254038, 0)), keep=Keep.TOP)


with BuildPart() as f1_1:
    add(f1.part)

    # F5_t45: cut F5_tool46
    add(f5_tool46.part, mode=Mode.SUBTRACT)

    # F5_s50 → F5_t51 (revolve, cut)
    with BuildSketch(Plane(origin=(-7.0249999987, -4.0558856412, 0), x_dir=(0, 0, 1), z_dir=(-0.8660254037, -0.5000000001, 0))):
        Polygon((19.25, 12.0500000007), (20, 11.3000000007), (20, 12.0500000007), align=None)
    revolve(axis=Axis((-11.8, 4.2146569655, 20), (0, 0, -1)), revolution_arc=F5_T51_ANGLE, mode=Mode.SUBTRACT)

    # F5_s52 → F5_t53 (revolve, cut)
    with BuildSketch(Plane.XZ.offset(-7.1500000001)):
        Polygon((-20.7, 4.25), (-19.95, 5), (-20.7, 5), align=None)
    revolve(axis=Axis((-18.2000000001, 7.1500000001, 5), (0, 0, -1)), revolution_arc=F5_T53_ANGLE, mode=Mode.SUBTRACT)

    # F5_s54 → F5_t55 (revolve, cut)
    with BuildSketch(Plane.YZ.offset(22.7000000001)):
        Polygon((8.9, 5), (9.65, 4.25), (9.65, 5), align=None)
    revolve(axis=Axis((22.7000000001, 7.1500000001, 5), (0, 0, -1)), revolution_arc=F5_T55_ANGLE, mode=Mode.SUBTRACT)

    # F5_s56 → F5_t57 (revolve, cut)
    with BuildSketch(Plane.YZ.offset(-18.2000000001)):
        Polygon((-8.9, 5), (-9.65, 4.25), (-9.65, 5), align=None)
    revolve(axis=Axis((-18.2000000001, -7.1500000001, 5), (0, 0, -1)), revolution_arc=F5_T57_ANGLE, mode=Mode.SUBTRACT)

    # F5_s58 → F5_t59 (revolve, cut)
    with BuildSketch(Plane.XZ.offset(7.1500000001)):
        Polygon((24.45, 5), (25.2, 4.25), (25.2, 5), align=None)
    revolve(axis=Axis((22.7000000001, -7.1500000001, 5), (0, 0, -1)), revolution_arc=F5_T59_ANGLE, mode=Mode.SUBTRACT)


with BuildPart() as f5_tool61:
    # F5_s62 → F5_t63 (new body)
    with BuildSketch(Plane(origin=(-4.3546429015, 2.5141542514, 0), x_dir=(0, 0, 1), z_dir=(-0.8660254038, 0.5, 0))):
        Polygon((19.25, 0.25), (20, -0.5), (20, 0.25), align=None)
    extrude(amount=F5_T63_DEPTH)

    split(bisect_by=Plane(origin=(-3.075, 5.3260562333, 0), x_dir=(0, 0, 1), z_dir=(-0.5, 0.8660254038, 0)), keep=Keep.TOP)


with BuildPart() as f1_2:
    add(f1_1.part)

    # F5_t60: cut F5_tool61
    add(f5_tool61.part, mode=Mode.SUBTRACT)


with BuildPart() as f5_tool66:
    # F5_s67 → F5_t68 (new body)
    with BuildSketch(Plane(origin=(1.825, 1.0536642413, 0), x_dir=(0, 0, 1), z_dir=(-0.8660254038, -0.5, 0))):
        Polygon((19.25, 6.15), (20, 5.4), (20, 6.15), align=None)
    extrude(amount=F5_T68_DEPTH)

    split(bisect_by=Plane(origin=(0.125, 0.2165063509, 0), x_dir=(0, 0, 1), z_dir=(0.5, 0.8660254038, 0)), keep=Keep.TOP)


with BuildPart() as f1_3:
    add(f1_2.part)

    # F5_t65: cut F5_tool66
    add(f5_tool66.part, mode=Mode.SUBTRACT)

    # F5_s70 → F5_t71 (revolve, cut)
    with BuildSketch(Plane(origin=(1.8250000004, 1.0536642417, 0), x_dir=(0, 0, 1), z_dir=(-0.8660254037, -0.5000000001, 0))):
        Polygon((19.25, 6.1499999998), (20, 5.3999999998), (20, 6.1499999998), align=None)
    revolve(axis=Axis((0, 4.2146569655, 20), (0, 0, -1)), revolution_arc=F5_T71_ANGLE, mode=Mode.SUBTRACT)

    # F5_s72 → F5_t73 (revolve, cut)
    with BuildSketch(Plane(origin=(-1.8250000004, -1.0536642417, 0), x_dir=(0, 0, 1), z_dir=(0.8660254037, 0.5000000001, 0))):
        Polygon((19.25, 6.1499999998), (20, 5.3999999998), (20, 6.1499999998), align=None)
    revolve(axis=Axis((0, -4.2146569655, 20), (0, 0, -1)), revolution_arc=F5_T73_ANGLE, mode=Mode.SUBTRACT)


with BuildPart() as f5_tool75:
    # F5_s76 → F5_t77 (new body)
    with BuildSketch(Plane(origin=(-4.4953570985, 2.5953956309, 0), x_dir=(0, 0, 1), z_dir=(0.8660254038, -0.5, 0))):
        Polygon((19.25, 6.15), (20, 5.4), (20, 6.15), align=None)
    extrude(amount=F5_T77_DEPTH)

    split(bisect_by=Plane(origin=(0.125, -0.2165063509, 0), x_dir=(0, 0, 1), z_dir=(0.5, -0.8660254038, 0)), keep=Keep.TOP)


with BuildPart() as f1_4:
    add(f1_3.part)

    # F5_t74: cut F5_tool75
    add(f5_tool75.part, mode=Mode.SUBTRACT)

    # F5_s79 → F5_t80 (revolve, cut)
    with BuildSketch(Plane(origin=(-10.6749999994, -6.1632141246, 0), x_dir=(0, 0, 1), z_dir=(0.8660254037, 0.5000000001, 0))):
        Polygon((19.25, 0.2499999988), (20, -0.5000000012), (20, 0.2499999988), align=None)
    revolve(axis=Axis((-11.8, -4.2146569655, 20), (0, 0, -1)), revolution_arc=F5_T80_ANGLE, mode=Mode.SUBTRACT)

    # F5_s81 → F5_t82 (revolve, cut)
    with BuildSketch(Plane(origin=(-8.3186687816, 8.5507312317, 0), x_dir=(0, 0, 1), z_dir=(0.6973135513, -0.716766218, 0))):
        Polygon((19.25, 10.705368879), (20, 9.955368879), (20, 10.705368879), align=None)
    revolve(axis=Axis((-14.2000000001, 2.8290163191, 20), (0, 0, -1)), revolution_arc=F5_T82_ANGLE, mode=Mode.SUBTRACT)

    # F5_s83 → F5_t84 (revolve, cut)
    with BuildSketch(Plane(origin=(0.5750000001, -0.3319764048, 0), x_dir=(0, 0, 1), z_dir=(-0.8660254038, 0.5, 0))):
        Polygon((20, 5.4), (19.25, 6.15), (20, 6.15), align=None)
    revolve(axis=Axis((2.4000000001, 2.8290163191, 20), (0, 0, -1)), revolution_arc=F5_T84_ANGLE, mode=Mode.SUBTRACT)

    # F5_s85 → F5_t86 (revolve, cut)
    with BuildSketch(Plane(origin=(2.580963754, -2.6529638285, 0), x_dir=(0, 0, 1), z_dir=(-0.6973135513, 0.716766218, 0))):
        Polygon((19.25, 2.247527507), (20, 1.497527507), (20, 2.247527507), align=None)
    revolve(axis=Axis((2.4000000001, -2.8290163191, 20), (0, 0, -1)), revolution_arc=F5_T86_ANGLE, mode=Mode.SUBTRACT)

    # F5_s87 → F5_t88 (revolve, cut)
    with BuildSketch(Plane(origin=(-9.4250000003, 5.441526287, 0), x_dir=(0, 0, 1), z_dir=(0.8660254038, -0.5, 0))):
        Polygon((20, 11.2999999998), (19.25, 12.0499999998), (20, 12.0499999998), align=None)
    revolve(axis=Axis((-14.2000000001, -2.8290163191, 20), (0, 0, -1)), revolution_arc=F5_T88_ANGLE, mode=Mode.SUBTRACT)


with BuildPart() as f5_tool91:
    # F5_s92 → F5_t93 (new body)
    with BuildSketch(Plane(origin=(-4.4953570985, 2.5953956309, 0), x_dir=(0, 0, 1), z_dir=(0.8660254038, -0.5, 0))):
        Polygon((19.25, 6.15), (20, 5.4), (20, 6.15), align=None)
    extrude(amount=F5_T93_DEPTH)

    split(bisect_by=Plane(origin=(0.125, -0.2165063509, 0), x_dir=(0, 0, 1), z_dir=(-0.5, 0.8660254038, 0)), keep=Keep.TOP)


with BuildPart() as f5_tool95:
    # F5_s96 → F5_t97 (new body)
    with BuildSketch(Plane(origin=(-10.675, -6.1632141236, 0), x_dir=(0, 0, 1), z_dir=(0.8660254038, 0.5, 0))):
        Polygon((19.25, 0.25), (20, -0.5), (20, 0.25), align=None)
    extrude(amount=F5_T97_DEPTH)

    split(bisect_by=Plane(origin=(-3.075, -5.3260562333, 0), x_dir=(0, 0, 1), z_dir=(0.5, 0.8660254038, 0)), keep=Keep.TOP)


with BuildPart() as f5_tool91_1:
    add(f5_tool91.part)

    # F5_t99: intersect F5_tool95
    add(f5_tool95.part, mode=Mode.INTERSECT)


with BuildPart() as f1_5:
    add(f1_4.part)

    # F5_t89: cut F5_tool91
    add(f5_tool91_1.part, mode=Mode.SUBTRACT)


with BuildPart() as f5_tool102:
    # F5_s103 → F5_t104 (new body)
    with BuildSketch(Plane(origin=(-4.3546429015, 2.5141542514, 0), x_dir=(0, 0, 1), z_dir=(-0.8660254038, 0.5, 0))):
        Polygon((19.25, 0.25), (20, -0.5), (20, 0.25), align=None)
    extrude(amount=F5_T104_DEPTH)

    split(bisect_by=Plane(origin=(-3.075, 5.3260562333, 0), x_dir=(0, 0, 1), z_dir=(0.5, -0.8660254038, 0)), keep=Keep.TOP)


with BuildPart() as f5_tool106:
    # F5_s107 → F5_t108 (new body)
    with BuildSketch(Plane(origin=(1.825, 1.0536642413, 0), x_dir=(0, 0, 1), z_dir=(-0.8660254038, -0.5, 0))):
        Polygon((19.25, 6.15), (20, 5.4), (20, 6.15), align=None)
    extrude(amount=F5_T108_DEPTH)

    split(bisect_by=Plane(origin=(0.125, 0.2165063509, 0), x_dir=(0, 0, 1), z_dir=(-0.5, -0.8660254038, 0)), keep=Keep.TOP)


with BuildPart() as f5_tool102_1:
    add(f5_tool102.part)

    # F5_t110: intersect F5_tool106
    add(f5_tool106.part, mode=Mode.INTERSECT)


with BuildPart() as f1_6:
    add(f1_5.part)

    # F5_t100: cut F5_tool102
    add(f5_tool102_1.part, mode=Mode.SUBTRACT)


solid = f1_6.part
